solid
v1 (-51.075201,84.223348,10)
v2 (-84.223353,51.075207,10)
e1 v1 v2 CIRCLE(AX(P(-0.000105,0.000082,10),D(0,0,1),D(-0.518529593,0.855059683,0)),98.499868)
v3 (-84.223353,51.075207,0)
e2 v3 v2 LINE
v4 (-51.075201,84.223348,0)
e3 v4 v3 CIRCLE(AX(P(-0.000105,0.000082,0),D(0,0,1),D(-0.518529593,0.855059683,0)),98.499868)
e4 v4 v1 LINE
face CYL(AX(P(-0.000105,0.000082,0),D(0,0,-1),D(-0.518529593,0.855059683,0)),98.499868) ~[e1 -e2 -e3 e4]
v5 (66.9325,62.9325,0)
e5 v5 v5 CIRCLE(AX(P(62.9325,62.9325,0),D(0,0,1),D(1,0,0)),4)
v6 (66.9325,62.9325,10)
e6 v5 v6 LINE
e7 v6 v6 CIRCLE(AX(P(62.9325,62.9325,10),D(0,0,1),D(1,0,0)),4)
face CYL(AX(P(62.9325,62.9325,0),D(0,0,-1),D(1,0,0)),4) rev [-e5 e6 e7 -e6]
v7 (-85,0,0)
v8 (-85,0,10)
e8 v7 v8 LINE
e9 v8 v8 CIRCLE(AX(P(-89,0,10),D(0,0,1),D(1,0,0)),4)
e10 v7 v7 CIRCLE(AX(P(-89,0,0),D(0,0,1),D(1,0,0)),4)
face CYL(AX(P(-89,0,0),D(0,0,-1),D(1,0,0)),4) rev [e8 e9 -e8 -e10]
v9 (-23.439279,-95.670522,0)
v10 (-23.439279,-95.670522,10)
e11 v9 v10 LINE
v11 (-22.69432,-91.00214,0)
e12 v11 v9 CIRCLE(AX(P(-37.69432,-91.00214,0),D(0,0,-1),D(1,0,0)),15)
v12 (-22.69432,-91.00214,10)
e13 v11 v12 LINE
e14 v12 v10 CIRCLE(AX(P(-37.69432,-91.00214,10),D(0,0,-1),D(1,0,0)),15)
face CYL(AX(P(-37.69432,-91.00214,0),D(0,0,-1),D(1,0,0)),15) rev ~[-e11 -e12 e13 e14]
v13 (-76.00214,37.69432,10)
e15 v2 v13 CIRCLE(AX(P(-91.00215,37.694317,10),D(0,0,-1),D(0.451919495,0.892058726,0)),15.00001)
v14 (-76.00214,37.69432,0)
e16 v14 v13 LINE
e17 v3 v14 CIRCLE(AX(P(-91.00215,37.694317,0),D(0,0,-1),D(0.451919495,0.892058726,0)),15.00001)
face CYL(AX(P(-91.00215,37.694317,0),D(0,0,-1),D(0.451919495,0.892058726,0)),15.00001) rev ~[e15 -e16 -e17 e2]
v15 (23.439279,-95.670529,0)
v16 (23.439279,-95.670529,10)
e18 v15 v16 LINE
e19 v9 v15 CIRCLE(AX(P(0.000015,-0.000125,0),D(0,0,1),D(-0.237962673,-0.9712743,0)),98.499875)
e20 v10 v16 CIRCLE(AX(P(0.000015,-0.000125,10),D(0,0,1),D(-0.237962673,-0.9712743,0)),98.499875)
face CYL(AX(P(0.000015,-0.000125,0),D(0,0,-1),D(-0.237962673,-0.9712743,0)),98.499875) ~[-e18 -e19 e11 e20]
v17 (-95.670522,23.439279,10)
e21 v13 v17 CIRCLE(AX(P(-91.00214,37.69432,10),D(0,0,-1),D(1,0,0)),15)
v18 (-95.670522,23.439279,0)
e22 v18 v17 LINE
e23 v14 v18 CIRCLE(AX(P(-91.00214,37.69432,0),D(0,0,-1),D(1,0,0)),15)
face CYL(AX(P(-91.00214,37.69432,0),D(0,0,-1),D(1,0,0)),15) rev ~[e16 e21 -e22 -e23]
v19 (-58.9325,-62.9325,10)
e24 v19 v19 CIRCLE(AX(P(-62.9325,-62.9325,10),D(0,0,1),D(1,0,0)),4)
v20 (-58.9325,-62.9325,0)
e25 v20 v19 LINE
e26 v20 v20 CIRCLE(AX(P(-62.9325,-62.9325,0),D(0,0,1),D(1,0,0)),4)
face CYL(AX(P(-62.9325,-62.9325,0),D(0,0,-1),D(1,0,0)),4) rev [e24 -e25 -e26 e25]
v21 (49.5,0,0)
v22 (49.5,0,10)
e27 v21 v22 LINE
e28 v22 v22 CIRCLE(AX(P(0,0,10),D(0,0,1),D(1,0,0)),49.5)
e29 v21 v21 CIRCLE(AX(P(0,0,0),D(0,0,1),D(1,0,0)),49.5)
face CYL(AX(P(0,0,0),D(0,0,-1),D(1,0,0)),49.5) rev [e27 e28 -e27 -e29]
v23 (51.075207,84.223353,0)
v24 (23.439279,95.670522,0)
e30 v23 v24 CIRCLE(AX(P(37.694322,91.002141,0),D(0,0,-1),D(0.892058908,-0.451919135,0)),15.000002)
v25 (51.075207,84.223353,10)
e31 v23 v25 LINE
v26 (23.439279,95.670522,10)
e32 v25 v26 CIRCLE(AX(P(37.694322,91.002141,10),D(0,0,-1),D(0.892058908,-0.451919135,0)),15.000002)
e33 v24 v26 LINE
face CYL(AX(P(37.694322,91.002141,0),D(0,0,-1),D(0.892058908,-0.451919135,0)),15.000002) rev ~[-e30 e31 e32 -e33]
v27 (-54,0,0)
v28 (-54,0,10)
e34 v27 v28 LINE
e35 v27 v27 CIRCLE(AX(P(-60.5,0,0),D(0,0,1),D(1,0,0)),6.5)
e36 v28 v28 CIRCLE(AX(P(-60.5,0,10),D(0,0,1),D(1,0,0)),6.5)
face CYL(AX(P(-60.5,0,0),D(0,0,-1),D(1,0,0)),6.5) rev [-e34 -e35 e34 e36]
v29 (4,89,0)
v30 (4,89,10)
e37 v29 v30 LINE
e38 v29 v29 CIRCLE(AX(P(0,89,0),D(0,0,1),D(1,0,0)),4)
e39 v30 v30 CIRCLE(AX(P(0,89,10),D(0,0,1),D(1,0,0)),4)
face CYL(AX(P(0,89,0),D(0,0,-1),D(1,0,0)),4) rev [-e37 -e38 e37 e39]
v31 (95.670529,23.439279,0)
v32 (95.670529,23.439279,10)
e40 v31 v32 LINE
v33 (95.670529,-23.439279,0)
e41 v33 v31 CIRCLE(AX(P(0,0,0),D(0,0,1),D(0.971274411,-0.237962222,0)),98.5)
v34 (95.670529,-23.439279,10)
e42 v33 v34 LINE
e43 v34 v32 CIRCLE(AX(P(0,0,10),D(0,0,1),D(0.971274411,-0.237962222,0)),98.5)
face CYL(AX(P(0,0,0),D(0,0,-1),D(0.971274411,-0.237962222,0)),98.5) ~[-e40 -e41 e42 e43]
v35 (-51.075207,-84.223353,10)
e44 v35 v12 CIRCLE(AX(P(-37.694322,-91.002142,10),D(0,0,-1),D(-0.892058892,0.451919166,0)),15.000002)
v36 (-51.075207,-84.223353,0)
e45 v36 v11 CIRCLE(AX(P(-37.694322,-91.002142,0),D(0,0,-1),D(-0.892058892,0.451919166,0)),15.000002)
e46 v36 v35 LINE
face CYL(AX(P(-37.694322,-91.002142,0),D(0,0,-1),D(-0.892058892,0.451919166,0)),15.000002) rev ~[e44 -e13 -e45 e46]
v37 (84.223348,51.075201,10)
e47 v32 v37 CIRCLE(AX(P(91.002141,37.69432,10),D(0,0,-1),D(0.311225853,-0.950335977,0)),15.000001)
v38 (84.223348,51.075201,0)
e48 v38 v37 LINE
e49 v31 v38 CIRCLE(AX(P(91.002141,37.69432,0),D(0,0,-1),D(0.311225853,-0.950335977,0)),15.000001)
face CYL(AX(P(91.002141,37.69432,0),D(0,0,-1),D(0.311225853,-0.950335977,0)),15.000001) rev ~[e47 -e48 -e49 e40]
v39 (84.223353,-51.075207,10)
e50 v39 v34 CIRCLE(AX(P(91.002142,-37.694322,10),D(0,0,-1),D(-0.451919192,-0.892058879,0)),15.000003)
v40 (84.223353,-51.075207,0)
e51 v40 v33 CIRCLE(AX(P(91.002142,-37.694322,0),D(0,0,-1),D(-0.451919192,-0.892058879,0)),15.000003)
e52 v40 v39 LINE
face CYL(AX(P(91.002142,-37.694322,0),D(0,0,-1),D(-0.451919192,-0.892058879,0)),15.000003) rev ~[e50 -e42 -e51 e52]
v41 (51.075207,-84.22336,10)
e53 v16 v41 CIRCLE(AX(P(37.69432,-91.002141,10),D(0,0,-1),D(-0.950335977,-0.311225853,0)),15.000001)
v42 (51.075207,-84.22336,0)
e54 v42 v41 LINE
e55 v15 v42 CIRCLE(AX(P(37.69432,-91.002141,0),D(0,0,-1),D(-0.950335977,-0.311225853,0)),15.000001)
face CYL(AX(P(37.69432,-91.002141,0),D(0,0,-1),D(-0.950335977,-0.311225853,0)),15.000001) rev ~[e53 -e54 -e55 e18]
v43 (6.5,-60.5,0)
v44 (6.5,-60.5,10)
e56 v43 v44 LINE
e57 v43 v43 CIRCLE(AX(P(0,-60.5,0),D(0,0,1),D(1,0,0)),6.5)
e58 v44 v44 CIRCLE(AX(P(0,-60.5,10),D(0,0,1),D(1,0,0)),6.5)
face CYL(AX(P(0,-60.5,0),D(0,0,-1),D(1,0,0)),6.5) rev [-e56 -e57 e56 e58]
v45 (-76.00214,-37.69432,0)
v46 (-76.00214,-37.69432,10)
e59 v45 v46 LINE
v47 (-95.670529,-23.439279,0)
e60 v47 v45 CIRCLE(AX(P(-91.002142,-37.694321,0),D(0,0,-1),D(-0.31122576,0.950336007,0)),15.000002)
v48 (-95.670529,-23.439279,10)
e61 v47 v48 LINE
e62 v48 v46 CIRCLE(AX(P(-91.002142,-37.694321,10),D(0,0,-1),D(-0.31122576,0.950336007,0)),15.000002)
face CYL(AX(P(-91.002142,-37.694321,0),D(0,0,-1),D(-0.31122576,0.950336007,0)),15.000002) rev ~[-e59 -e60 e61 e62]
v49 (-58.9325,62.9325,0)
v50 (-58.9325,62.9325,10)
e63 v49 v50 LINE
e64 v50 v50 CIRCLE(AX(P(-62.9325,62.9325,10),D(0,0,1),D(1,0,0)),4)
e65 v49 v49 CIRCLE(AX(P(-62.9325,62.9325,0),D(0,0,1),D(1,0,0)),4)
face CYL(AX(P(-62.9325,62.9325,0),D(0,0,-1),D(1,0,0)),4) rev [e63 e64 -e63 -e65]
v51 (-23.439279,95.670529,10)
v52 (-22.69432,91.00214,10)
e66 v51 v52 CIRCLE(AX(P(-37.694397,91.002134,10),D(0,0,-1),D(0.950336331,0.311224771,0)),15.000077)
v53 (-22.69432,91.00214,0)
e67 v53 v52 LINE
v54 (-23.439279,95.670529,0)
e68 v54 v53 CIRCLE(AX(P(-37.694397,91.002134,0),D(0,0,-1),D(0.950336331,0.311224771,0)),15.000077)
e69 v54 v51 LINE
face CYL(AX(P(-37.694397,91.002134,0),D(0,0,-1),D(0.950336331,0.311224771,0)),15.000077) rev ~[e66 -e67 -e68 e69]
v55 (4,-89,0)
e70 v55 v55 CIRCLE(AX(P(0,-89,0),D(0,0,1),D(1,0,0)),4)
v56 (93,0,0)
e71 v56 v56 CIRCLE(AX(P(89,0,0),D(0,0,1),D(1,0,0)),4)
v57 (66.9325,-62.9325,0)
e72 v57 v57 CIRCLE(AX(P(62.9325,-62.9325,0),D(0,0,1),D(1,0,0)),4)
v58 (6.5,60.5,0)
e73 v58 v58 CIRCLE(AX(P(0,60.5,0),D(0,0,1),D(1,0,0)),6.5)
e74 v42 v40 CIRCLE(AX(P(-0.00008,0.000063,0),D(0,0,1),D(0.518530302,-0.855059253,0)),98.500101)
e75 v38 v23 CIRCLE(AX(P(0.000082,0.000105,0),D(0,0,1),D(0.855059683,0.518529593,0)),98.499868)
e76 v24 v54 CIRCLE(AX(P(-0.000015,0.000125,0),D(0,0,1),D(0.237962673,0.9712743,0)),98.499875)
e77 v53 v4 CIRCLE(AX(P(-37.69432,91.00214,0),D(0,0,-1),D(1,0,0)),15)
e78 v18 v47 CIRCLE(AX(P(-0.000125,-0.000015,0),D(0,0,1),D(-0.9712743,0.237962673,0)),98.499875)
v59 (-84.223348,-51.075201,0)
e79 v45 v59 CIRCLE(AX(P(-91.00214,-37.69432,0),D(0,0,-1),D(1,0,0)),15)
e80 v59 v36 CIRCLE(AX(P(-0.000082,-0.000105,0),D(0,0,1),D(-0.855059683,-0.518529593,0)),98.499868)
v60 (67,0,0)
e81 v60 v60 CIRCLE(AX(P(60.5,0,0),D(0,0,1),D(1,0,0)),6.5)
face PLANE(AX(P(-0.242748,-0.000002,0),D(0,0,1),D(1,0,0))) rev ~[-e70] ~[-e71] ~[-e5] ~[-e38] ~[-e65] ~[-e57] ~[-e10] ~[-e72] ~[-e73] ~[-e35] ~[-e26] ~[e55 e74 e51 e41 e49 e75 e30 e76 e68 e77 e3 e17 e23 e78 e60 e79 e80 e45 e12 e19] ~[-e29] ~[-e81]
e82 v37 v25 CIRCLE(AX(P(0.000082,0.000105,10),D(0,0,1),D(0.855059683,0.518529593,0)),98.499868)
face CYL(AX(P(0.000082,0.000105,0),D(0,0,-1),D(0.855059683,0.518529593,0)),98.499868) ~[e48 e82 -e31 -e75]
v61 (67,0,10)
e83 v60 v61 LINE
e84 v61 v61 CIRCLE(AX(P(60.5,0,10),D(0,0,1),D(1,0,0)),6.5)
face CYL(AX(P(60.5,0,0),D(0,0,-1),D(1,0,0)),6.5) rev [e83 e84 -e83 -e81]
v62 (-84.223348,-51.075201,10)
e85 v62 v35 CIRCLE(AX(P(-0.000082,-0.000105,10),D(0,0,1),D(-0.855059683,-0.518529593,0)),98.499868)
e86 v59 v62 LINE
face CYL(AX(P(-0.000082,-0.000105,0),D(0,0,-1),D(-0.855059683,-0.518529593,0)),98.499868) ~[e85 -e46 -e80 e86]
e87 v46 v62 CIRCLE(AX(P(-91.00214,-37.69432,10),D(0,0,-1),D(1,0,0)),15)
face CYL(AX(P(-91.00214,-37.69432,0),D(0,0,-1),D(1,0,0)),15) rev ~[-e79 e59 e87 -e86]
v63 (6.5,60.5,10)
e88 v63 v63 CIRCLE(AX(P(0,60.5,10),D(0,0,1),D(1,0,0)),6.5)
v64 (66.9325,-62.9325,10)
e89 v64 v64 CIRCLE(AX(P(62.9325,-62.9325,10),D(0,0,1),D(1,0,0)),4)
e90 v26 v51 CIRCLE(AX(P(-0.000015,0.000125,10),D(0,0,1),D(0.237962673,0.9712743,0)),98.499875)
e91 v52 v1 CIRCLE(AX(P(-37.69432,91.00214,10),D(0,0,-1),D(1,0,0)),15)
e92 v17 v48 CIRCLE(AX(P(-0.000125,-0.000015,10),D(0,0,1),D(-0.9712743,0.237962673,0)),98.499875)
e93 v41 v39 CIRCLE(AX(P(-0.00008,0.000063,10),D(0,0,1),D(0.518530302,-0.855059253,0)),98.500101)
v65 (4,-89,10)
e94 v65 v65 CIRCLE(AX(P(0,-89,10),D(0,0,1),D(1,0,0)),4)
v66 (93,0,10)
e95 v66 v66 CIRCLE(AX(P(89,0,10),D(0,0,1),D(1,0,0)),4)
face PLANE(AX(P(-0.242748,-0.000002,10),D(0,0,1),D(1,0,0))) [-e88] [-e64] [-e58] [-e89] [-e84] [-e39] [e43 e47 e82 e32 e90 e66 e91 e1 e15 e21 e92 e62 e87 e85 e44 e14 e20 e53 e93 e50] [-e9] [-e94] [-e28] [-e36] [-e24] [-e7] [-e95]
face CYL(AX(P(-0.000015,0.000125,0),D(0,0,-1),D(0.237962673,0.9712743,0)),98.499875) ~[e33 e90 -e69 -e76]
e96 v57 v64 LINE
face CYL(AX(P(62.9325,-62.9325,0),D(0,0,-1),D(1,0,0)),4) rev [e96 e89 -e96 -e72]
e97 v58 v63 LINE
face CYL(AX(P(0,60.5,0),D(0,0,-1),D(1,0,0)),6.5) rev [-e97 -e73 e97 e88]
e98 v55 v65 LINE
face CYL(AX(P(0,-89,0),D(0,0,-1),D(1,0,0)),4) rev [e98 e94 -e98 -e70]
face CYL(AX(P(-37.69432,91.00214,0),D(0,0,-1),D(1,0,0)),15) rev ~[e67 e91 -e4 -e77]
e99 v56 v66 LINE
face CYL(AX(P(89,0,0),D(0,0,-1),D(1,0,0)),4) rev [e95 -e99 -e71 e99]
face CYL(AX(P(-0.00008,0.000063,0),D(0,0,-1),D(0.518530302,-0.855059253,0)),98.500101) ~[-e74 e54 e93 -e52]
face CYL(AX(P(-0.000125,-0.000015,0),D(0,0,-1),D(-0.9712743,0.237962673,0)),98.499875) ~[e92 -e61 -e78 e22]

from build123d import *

# Parameters (mm, degrees)
F0_R     = 4
F0_R_2   = 6.5
F0_R_3   = 49.5
F1_DEPTH = 10


# Not quite as in the source:
# - ends of sketch curves that miss each other by under 0.0002 mm in the source are joined


with BuildPart() as f1:
    # F0 (on Top) → F1 (new body)
    with BuildSketch(Plane.XY):
        with BuildLine():
            ThreePointArc((95.6705294551, -23.4392788665), (97.790074014, -11.804720426), (98.5, 0))
            ThreePointArc((98.5, 0), (97.790074014, 11.804720426), (95.6705294551, 23.4392788665))
            ThreePointArc((95.6705294551, 23.4392788665), (77.143947059, 31.9540684018), (84.2233479596, 51.0752010798))
            ThreePointArc((84.2233479596, 51.0752010798), (69.6500179469, 69.6500179469), (51.0752071036, 84.2233531708))
            ThreePointArc((51.0752071036, 84.2233531708), (31.9540684018, 77.143947059), (23.4392785061, 95.6705221617))
            ThreePointArc((23.4392785061, 95.6705221617), (0, 98.5), (-23.4392788665, 95.6705294551))
            ThreePointArc((-23.4392788665, 95.6705294551), (-22.8817314531, 93.3658702171), (-22.69432, 91.00214))
            ThreePointArc((-22.69432, 91.00214), (-34.2095830083, 76.4125338333), (-51.0752010798, 84.2233479596))
            ThreePointArc((-51.0752010798, 84.2233479596), (-69.6500179469, 69.6500179469), (-84.2233531708, 51.0752071036))
            ThreePointArc((-84.2233531708, 51.0752071036), (-78.2216528988, 45.5466540133), (-76.00214, 37.69432))
            ThreePointArc((-76.00214, 37.69432), (-82.1994623513, 25.5488325165), (-95.6705221617, 23.4392785061))
            ThreePointArc((-95.6705221617, 23.4392785061), (-98.5, 0), (-95.6705294551, -23.4392788665))
            ThreePointArc((-95.6705294551, -23.4392788665), (-82.1994623513, -25.5488325165), (-76.00214, -37.69432))
            ThreePointArc((-76.00214, -37.69432), (-78.2216493872, -45.5466482978), (-84.2233479596, -51.0752010798))
            ThreePointArc((-84.2233479596, -51.0752010798), (-69.6500179469, -69.6500179469), (-51.0752071036, -84.2233531708))
            ThreePointArc((-51.0752071036, -84.2233531708), (-34.2095830083, -76.4125338333), (-22.69432, -91.00214))
            ThreePointArc((-22.69432, -91.00214), (-22.8817303816, -93.3658635024), (-23.4392785061, -95.6705221617))
            ThreePointArc((-23.4392785061, -95.6705221617), (0, -98.5), (23.4392788665, -95.6705294551))
            ThreePointArc((23.4392788665, -95.6705294551), (31.9540745992, -77.143944492), (51.0752071429, -84.2233599276))
            ThreePointArc((51.0752071429, -84.2233599276), (69.6500179469, -69.6500179469), (84.2233531708, -51.0752071036))
            ThreePointArc((84.2233531708, -51.0752071036), (77.1439496611, -31.9540621197), (95.6705294551, -23.4392788665))
        make_face()
        with Locations((-62.9325, -62.9325)):
            Circle(F0_R, mode=Mode.SUBTRACT)
        with Locations((0, -89)):
            Circle(F0_R, mode=Mode.SUBTRACT)
        with Locations((0, -60.5)):
            Circle(F0_R_2, mode=Mode.SUBTRACT)
        with Locations((-89, 0)):
            Circle(F0_R, mode=Mode.SUBTRACT)
        with Locations((-60.5, 0)):
            Circle(F0_R_2, mode=Mode.SUBTRACT)
        Circle(F0_R_3, mode=Mode.SUBTRACT)
        with Locations((62.9325, -62.9325)):
            Circle(F0_R, mode=Mode.SUBTRACT)
        with Locations((60.5, 0)):
            Circle(F0_R_2, mode=Mode.SUBTRACT)
        with Locations((89, 0)):
            Circle(F0_R, mode=Mode.SUBTRACT)
        with Locations((-62.9325, 62.9325)):
            Circle(F0_R, mode=Mode.SUBTRACT)
        with Locations((0, 60.5)):
            Circle(F0_R_2, mode=Mode.SUBTRACT)
        with Locations((0, 89)):
            Circle(F0_R, mode=Mode.SUBTRACT)
        with Locations((62.9325, 62.9325)):
            Circle(F0_R, mode=Mode.SUBTRACT)
    extrude(amount=F1_DEPTH)


solid = f1.part
